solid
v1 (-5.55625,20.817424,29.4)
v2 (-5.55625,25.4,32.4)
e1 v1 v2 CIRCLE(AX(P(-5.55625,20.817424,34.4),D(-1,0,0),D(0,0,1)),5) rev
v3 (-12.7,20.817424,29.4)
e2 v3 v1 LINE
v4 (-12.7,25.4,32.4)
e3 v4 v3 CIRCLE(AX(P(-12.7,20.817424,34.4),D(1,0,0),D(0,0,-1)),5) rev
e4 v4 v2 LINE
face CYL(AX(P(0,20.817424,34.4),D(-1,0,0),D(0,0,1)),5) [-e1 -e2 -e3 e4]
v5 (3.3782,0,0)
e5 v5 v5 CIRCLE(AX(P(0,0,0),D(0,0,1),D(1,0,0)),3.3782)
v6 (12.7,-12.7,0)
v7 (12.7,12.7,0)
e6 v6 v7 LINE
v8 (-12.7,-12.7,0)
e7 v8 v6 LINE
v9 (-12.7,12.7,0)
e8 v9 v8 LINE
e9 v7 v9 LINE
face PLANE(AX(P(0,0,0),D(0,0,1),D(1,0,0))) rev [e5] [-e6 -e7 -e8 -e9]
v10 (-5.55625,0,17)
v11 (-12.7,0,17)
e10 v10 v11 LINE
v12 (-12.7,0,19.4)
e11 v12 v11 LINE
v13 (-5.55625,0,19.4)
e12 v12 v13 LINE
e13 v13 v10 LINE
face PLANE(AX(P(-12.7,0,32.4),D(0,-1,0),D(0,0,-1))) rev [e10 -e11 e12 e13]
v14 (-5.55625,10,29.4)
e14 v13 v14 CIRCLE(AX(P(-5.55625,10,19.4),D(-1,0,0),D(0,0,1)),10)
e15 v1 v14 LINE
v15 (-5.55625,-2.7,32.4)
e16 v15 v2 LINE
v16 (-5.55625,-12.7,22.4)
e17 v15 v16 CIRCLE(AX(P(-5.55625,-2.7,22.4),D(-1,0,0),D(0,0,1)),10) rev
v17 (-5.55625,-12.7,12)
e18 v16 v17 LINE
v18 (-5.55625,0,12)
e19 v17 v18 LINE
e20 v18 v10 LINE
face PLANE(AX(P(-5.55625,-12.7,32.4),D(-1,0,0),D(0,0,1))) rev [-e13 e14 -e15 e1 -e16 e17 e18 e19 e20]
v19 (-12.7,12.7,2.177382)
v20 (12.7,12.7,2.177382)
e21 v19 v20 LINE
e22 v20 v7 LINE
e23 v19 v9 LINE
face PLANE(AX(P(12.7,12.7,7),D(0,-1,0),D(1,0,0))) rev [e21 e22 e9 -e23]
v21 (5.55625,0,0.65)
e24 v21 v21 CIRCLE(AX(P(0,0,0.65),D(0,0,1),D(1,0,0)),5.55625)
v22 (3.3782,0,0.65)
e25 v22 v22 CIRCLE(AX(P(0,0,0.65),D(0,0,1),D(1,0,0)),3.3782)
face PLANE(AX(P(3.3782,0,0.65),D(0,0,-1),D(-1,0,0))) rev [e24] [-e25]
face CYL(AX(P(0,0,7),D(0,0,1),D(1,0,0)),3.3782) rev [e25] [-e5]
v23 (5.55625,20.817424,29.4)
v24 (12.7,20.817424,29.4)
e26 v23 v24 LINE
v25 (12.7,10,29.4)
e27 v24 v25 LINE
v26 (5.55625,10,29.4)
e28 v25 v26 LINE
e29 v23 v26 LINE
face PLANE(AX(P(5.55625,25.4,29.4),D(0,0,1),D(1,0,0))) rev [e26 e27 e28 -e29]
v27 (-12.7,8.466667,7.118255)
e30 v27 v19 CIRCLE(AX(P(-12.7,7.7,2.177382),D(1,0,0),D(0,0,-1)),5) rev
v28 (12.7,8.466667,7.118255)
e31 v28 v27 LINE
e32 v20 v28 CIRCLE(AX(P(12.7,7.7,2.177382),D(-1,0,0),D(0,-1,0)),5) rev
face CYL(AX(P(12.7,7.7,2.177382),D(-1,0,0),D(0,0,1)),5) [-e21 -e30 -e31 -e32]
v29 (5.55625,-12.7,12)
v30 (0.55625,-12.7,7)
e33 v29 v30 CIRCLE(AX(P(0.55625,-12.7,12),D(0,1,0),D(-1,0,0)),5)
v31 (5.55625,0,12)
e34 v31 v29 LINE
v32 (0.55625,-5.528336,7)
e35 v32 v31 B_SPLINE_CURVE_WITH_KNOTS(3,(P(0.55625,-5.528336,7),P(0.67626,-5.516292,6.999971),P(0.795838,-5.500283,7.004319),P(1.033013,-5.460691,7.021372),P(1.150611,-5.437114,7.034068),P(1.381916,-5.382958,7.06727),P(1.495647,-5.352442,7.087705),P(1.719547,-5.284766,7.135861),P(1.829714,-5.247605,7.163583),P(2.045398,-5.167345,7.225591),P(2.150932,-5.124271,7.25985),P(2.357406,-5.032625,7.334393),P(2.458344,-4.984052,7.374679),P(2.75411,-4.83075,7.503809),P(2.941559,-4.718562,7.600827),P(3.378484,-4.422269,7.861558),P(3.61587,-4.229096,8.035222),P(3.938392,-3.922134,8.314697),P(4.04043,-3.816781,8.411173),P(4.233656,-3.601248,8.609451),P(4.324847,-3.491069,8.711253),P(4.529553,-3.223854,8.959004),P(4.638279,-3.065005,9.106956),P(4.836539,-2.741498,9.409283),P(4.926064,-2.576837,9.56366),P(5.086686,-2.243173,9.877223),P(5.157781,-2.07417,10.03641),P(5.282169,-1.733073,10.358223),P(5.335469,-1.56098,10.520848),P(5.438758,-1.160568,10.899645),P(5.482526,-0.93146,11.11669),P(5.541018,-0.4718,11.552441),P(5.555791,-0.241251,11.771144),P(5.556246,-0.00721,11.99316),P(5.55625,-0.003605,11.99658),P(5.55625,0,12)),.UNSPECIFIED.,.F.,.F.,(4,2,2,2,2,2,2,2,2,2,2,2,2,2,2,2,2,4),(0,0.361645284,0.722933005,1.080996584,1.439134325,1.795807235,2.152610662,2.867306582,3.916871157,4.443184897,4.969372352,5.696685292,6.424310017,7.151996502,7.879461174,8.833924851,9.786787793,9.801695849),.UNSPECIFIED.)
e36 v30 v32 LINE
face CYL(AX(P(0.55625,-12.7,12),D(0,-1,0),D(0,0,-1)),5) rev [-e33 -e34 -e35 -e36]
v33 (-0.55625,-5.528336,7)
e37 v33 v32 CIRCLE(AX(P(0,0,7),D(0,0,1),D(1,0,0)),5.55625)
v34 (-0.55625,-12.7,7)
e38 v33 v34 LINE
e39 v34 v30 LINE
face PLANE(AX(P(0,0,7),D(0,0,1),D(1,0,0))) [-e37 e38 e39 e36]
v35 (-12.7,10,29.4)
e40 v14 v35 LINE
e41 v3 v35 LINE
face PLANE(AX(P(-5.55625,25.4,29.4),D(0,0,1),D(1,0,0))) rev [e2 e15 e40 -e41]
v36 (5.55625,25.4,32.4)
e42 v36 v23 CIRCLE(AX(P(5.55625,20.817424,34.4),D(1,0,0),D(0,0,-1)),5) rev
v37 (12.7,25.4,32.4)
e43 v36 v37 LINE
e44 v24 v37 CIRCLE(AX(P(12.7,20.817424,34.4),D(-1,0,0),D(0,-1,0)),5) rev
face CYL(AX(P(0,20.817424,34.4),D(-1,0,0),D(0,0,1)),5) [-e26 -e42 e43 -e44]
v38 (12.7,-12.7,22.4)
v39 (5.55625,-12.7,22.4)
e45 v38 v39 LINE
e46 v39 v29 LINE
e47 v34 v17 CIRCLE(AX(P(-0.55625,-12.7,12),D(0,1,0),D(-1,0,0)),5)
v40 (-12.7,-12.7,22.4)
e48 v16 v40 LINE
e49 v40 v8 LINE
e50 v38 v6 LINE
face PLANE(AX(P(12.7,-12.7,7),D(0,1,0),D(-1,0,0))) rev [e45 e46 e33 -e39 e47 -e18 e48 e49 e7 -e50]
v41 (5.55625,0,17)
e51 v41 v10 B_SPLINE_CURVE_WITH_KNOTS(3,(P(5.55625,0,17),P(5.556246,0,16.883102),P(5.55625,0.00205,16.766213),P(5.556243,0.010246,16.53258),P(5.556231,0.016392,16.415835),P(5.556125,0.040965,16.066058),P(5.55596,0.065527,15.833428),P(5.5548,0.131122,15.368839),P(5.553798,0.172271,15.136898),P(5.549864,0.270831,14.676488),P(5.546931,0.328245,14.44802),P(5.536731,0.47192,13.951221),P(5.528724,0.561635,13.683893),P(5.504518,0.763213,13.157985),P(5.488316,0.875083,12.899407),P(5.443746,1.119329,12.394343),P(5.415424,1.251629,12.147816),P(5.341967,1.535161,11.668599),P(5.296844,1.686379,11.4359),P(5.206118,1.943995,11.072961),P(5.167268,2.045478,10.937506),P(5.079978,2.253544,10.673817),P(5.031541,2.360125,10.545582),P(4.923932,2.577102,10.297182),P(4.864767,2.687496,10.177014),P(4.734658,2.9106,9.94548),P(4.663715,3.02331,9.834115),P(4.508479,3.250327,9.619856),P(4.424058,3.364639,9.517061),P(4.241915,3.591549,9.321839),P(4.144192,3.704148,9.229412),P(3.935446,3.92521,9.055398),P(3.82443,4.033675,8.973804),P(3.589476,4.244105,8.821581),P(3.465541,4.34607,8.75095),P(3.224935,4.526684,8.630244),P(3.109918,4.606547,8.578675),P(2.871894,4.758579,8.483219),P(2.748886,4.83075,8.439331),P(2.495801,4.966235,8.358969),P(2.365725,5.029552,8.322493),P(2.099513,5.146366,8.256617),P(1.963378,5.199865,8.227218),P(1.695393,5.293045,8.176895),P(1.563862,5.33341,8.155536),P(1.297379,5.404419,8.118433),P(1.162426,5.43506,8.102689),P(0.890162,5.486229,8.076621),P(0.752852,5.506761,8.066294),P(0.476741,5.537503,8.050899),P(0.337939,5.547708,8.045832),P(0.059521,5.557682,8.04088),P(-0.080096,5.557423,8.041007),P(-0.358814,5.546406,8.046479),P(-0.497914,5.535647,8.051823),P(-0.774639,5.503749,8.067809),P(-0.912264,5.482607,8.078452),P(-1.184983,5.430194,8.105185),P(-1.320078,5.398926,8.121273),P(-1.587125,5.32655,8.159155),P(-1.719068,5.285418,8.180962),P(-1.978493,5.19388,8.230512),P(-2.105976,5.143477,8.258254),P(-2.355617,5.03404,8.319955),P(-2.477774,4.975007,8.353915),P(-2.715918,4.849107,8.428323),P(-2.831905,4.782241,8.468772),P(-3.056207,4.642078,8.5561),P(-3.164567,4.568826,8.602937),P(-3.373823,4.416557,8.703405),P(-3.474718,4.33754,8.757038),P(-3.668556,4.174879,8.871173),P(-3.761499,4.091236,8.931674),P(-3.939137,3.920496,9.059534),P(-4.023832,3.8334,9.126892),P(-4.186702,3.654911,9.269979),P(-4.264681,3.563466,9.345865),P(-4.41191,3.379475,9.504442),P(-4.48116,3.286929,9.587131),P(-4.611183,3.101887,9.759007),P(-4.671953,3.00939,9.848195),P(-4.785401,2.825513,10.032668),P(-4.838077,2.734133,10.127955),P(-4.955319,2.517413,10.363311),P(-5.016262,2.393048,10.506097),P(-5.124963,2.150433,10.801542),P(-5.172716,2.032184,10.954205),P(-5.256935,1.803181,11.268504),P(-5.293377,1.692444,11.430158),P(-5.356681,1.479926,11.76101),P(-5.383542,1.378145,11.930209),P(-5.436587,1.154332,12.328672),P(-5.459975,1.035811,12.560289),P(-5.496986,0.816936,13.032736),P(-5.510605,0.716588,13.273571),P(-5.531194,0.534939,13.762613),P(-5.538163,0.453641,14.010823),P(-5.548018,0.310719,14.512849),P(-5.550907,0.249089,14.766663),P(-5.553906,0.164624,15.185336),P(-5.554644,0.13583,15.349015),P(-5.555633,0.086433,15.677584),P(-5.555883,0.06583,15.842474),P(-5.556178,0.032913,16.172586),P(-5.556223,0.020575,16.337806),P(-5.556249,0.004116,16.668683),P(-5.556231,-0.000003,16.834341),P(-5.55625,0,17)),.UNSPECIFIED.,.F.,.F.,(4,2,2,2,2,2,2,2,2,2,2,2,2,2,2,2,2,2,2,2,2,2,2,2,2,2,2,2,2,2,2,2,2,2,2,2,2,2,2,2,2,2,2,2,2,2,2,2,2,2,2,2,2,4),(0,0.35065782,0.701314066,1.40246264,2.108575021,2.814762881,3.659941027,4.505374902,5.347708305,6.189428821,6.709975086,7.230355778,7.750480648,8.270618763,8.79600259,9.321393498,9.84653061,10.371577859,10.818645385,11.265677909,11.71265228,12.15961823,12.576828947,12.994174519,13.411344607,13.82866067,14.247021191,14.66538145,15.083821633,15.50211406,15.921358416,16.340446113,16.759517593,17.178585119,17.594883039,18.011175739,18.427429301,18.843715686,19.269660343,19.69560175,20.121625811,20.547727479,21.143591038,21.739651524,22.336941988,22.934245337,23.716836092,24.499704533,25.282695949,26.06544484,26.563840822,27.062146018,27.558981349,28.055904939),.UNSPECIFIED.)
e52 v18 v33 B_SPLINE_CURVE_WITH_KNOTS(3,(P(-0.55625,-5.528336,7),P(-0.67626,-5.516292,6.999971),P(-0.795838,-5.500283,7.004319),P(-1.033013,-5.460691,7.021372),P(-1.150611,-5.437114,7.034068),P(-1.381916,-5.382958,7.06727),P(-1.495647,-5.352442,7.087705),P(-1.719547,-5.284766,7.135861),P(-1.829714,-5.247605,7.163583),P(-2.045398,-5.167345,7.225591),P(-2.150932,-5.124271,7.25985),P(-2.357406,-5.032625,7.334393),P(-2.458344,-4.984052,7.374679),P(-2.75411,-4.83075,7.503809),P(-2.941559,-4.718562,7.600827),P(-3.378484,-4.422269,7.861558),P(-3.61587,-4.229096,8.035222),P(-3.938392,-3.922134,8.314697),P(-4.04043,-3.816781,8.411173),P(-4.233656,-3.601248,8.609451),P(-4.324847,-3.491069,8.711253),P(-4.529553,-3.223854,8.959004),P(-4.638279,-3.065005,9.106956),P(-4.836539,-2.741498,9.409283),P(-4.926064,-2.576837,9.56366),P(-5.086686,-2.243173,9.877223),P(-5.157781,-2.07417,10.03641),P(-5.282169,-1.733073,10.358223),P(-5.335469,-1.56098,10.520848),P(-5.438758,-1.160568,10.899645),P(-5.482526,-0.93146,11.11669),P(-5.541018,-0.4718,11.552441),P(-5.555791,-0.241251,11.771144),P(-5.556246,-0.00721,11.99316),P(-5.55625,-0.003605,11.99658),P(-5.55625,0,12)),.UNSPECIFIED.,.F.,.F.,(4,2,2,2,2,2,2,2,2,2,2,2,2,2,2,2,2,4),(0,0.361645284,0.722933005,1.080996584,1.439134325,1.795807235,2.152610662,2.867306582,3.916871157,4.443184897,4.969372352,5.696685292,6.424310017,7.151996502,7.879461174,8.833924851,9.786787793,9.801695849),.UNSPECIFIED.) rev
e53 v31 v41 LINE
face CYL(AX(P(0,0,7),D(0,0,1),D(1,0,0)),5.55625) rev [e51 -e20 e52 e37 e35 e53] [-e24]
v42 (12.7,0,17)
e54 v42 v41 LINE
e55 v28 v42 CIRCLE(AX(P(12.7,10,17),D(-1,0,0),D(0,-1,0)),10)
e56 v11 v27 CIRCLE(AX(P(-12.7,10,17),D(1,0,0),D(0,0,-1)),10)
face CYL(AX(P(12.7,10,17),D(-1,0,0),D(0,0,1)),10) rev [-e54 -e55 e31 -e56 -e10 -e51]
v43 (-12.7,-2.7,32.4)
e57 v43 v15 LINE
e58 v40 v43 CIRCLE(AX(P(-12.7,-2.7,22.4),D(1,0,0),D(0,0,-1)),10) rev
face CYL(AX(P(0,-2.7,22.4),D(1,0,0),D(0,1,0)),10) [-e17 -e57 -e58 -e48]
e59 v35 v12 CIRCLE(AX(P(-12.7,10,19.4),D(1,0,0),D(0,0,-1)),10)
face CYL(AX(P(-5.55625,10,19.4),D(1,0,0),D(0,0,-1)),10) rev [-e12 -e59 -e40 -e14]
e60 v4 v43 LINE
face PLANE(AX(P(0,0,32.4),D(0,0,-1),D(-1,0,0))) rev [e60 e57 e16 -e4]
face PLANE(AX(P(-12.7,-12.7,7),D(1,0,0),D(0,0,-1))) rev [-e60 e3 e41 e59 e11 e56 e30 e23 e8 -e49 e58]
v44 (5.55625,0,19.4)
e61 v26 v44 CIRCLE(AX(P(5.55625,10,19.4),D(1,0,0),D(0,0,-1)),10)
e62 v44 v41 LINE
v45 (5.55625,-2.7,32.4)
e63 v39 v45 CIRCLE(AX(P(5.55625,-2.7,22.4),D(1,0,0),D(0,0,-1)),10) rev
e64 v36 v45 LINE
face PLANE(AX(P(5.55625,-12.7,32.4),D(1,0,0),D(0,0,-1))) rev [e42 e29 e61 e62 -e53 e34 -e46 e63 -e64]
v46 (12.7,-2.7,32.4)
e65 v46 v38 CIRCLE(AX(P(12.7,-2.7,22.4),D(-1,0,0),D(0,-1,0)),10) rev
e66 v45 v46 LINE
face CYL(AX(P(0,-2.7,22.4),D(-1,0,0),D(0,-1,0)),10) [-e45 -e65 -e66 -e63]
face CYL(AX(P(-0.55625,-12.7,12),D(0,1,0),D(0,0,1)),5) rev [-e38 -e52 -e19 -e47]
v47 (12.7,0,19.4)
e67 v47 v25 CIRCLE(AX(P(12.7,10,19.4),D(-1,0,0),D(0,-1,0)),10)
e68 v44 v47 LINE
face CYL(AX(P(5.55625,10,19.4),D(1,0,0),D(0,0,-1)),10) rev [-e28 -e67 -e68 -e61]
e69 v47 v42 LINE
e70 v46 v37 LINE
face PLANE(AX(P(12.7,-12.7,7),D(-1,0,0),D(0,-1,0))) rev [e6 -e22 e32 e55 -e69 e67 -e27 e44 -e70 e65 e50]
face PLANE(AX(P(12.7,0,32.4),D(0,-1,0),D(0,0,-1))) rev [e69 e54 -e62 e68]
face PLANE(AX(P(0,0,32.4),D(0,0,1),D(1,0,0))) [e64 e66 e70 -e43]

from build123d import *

# Parameters (mm, degrees)
SKETCH1_W                                        = 25.4
SKETCH1_H                                        = 25.4
BOSS_EXTRUDE1_DEPTH                              = 7
CBORE_FOR_1_4_SOCKET_HEAD_CAP_SCREW1_D           = 6.7564
CBORE_FOR_1_4_SOCKET_HEAD_CAP_SCREW1_CBORE_D     = 11.1125
CBORE_FOR_1_4_SOCKET_HEAD_CAP_SCREW1_CBORE_DEPTH = 6.35
SKETCH4_W                                        = 7.14375
SKETCH4_H                                        = 12.7
BOSS_EXTRUDE2_DEPTH                              = 25.4
SKETCH5_W                                        = 7.14375
SKETCH5_H                                        = 3
BOSS_EXTRUDE3_DEPTH                              = 25.4
FILLET1_R                                        = 10
FILLET2_START                                    = -14
FILLET2_DEPTH                                    = 28
FILLET2_START_2                                  = -12.7
FILLET2_2_DEPTH                                  = 12.604348727
FILLET2_START_3                                  = 7
FILLET2_3_DEPTH                                  = 10.0000001


with BuildPart() as part:
    # Sketch1 → Boss-Extrude1 (new body)
    with BuildSketch(Plane.XY):
        Rectangle(SKETCH1_W, SKETCH1_H)
    extrude(amount=BOSS_EXTRUDE1_DEPTH)

    # CBORE for 1/4 Socket Head Cap Screw1 (through all)
    with Locations(Plane.XY.offset(7)):
        with Locations((0, 0)):
            CounterBoreHole(CBORE_FOR_1_4_SOCKET_HEAD_CAP_SCREW1_D / 2, CBORE_FOR_1_4_SOCKET_HEAD_CAP_SCREW1_CBORE_D / 2, CBORE_FOR_1_4_SOCKET_HEAD_CAP_SCREW1_CBORE_DEPTH)

    # Sketch4 → Boss-Extrude2 (add)
    with BuildSketch(Plane.XY.offset(7)):
        with Locations((-9.128125, -6.35)):
            Rectangle(SKETCH4_W, SKETCH4_H)
        with Locations((9.128125, -6.35)):
            Rectangle(SKETCH4_W, SKETCH4_H)
    extrude(amount=BOSS_EXTRUDE2_DEPTH)

    # Sketch5 → Boss-Extrude3 (add)
    with BuildSketch(Plane(origin=(0, 0, 0), x_dir=(1, 0, 0), z_dir=(0, 1, 0))):
        with Locations((-9.128125, -30.9)):
            Rectangle(SKETCH5_W, SKETCH5_H)
        with Locations((9.128125, -30.9)):
            Rectangle(SKETCH5_W, SKETCH5_H)
    extrude(amount=BOSS_EXTRUDE3_DEPTH)

    # Fillet1
    # the kernel refuses this fillet: 10 mm, written as the material it adds along each edge
    with BuildSketch(Plane(origin=(-19.44375, 0, 7), x_dir=(0, 1, 0), z_dir=(1, 0, 0))) as fillet1_piece_1_section:
        with BuildLine():
            CenterArc((FILLET1_R, FILLET1_R), FILLET1_R, 180, 90)
            Line((0, FILLET1_R), (0, 0))
            Line((0, 0), (FILLET1_R, 0))
        make_face()
    fillet1_piece_1 = extrude(amount=32.14375, mode=Mode.PRIVATE)
    fillet1_piece_1 = fillet1_piece_1 - Plane(origin=(0, 0, 7), x_dir=(1, 0, 0), z_dir=(0, 0, 1)) * Cylinder(5.55625, 105, mode=Mode.PRIVATE)
    fillet1_piece_1 = split(fillet1_piece_1, bisect_by=Plane(origin=(-12.7, 0, 7), z_dir=(1, 0, 0)), keep=Keep.TOP, mode=Mode.PRIVATE)
    add(fillet1_piece_1)
    with BuildSketch(Plane(origin=(-12.7, 0, 29.4), x_dir=(0, 0, -1), z_dir=(1, 0, 0))) as fillet1_piece_2:
        with BuildLine():
            CenterArc((FILLET1_R, FILLET1_R), FILLET1_R, 180, 90)
            Line((0, FILLET1_R), (0, 0))
            Line((0, 0), (FILLET1_R, 0))
        make_face()
    extrude(amount=7.14375)
    with BuildSketch(Plane(origin=(-37.7, 0, 29.4), x_dir=(0, 0, -1), z_dir=(1, 0, 0))) as fillet1_piece_3_section:
        with BuildLine():
            CenterArc((FILLET1_R, FILLET1_R), FILLET1_R, 180, 90)
            Line((0, FILLET1_R), (0, 0))
            Line((0, 0), (FILLET1_R, 0))
        make_face()
    fillet1_piece_3 = extrude(amount=57.14375, mode=Mode.PRIVATE)
    fillet1_piece_3 = split(fillet1_piece_3, bisect_by=Plane(origin=(5.55625, 0, 29.4), z_dir=(1, 0, 0)), keep=Keep.TOP, mode=Mode.PRIVATE)
    fillet1_piece_3 = split(fillet1_piece_3, bisect_by=Plane(origin=(12.7, 0, 29.4), z_dir=(-1, 0, 0)), keep=Keep.TOP, mode=Mode.PRIVATE)
    add(fillet1_piece_3)
    with BuildSketch(Plane(origin=(12.7, 0, 29.4), x_dir=(0, 0, -1), z_dir=(-1, 0, 0))) as fillet1_piece_4:
        with BuildLine():
            CenterArc((FILLET1_R, -FILLET1_R), FILLET1_R, 90, 90)
            Line((0, -FILLET1_R), (0, 0))
            Line((0, 0), (FILLET1_R, 0))
        make_face()
    extrude(amount=7.14375)
    with BuildSketch(Plane(origin=(37.7, 0, 29.4), x_dir=(0, 0, -1), z_dir=(-1, 0, 0))) as fillet1_piece_5_section:
        with BuildLine():
            CenterArc((FILLET1_R, -FILLET1_R), FILLET1_R, 90, 90)
            Line((0, -FILLET1_R), (0, 0))
            Line((0, 0), (FILLET1_R, 0))
        make_face()
    fillet1_piece_5 = extrude(amount=57.14375, mode=Mode.PRIVATE)
    fillet1_piece_5 = split(fillet1_piece_5, bisect_by=Plane(origin=(-12.7, 0, 29.4), z_dir=(1, 0, 0)), keep=Keep.TOP, mode=Mode.PRIVATE)
    fillet1_piece_5 = split(fillet1_piece_5, bisect_by=Plane(origin=(-5.55625, 0, 29.4), z_dir=(-1, 0, 0)), keep=Keep.TOP, mode=Mode.PRIVATE)
    add(fillet1_piece_5)
    # the kernel refuses this fillet: 10 mm, written as the material it takes off along each edge
    with BuildSketch(Plane(origin=(-37.7, -12.7, 32.4), x_dir=(0, 0, -1), z_dir=(1, 0, 0))) as fillet1_2_piece_1:
        with BuildLine():
            CenterArc((FILLET1_R, FILLET1_R), FILLET1_R, 180, 90)
            Line((0, FILLET1_R), (0, 0))
            Line((0, 0), (FILLET1_R, 0))
        make_face()
    extrude(amount=57.14375, mode=Mode.SUBTRACT)
    with BuildSketch(Plane(origin=(37.7, -12.7, 32.4), x_dir=(0, 0, -1), z_dir=(-1, 0, 0))) as fillet1_2_piece_2:
        with BuildLine():
            CenterArc((FILLET1_R, -FILLET1_R), FILLET1_R, 90, 90)
            Line((0, -FILLET1_R), (0, 0))
            Line((0, 0), (FILLET1_R, 0))
        make_face()
    extrude(amount=57.14375, mode=Mode.SUBTRACT)

    # Fillet2: read off the stored shape, not the designer's step
    # Fillet2 outline → Fillet2 (cut)
    with BuildSketch(Plane.YZ.offset(FILLET2_START)):
        with BuildLine():
            ThreePointArc((10, 7), (9.231056683, 7.029607521), (8.466666667, 7.118254765))
            ThreePointArc((8.466666667, 7.118254765), (11.496928583, 5.430585697), (12.7, 2.177382148))
            Line((12.7, 2.177382148), (12.7, 7))
            Line((12.7, 7), (10, 7))
        make_face()
        with BuildLine():
            Line((25.4, 29.4), (25.4, 32.4))
            ThreePointArc((25.4, 32.4), (23.556037093, 30.216699867), (20.817424305, 29.4))
            Line((20.817424305, 29.4), (25.4, 29.4))
        make_face()
    extrude(amount=FILLET2_DEPTH, mode=Mode.SUBTRACT)

    # Fillet2 2 outline → Fillet2 2 (add)
    with BuildSketch(Plane(origin=(0, 0, 0), x_dir=(1, 0, 0), z_dir=(0, 1, 0)).offset(FILLET2_START_2)):
        with BuildLine():
            Line((5.55625, -7), (0.55625, -7))
            ThreePointArc((0.55625, -7), (4.091783906, -8.464466094), (5.55625, -12))
            Line((5.55625, -12), (5.55625, -7))
        make_face()
        with BuildLine():
            ThreePointArc((-5.55625, -12), (-4.091783906, -8.464466094), (-0.55625, -7))
            Line((-0.55625, -7), (-5.55625, -7))
            Line((-5.55625, -7), (-5.55625, -12))
        make_face()
    extrude(amount=FILLET2_2_DEPTH)

    # Fillet2 3 outline → Fillet2 3 (cut)
    with BuildSketch(Plane.XY.offset(FILLET2_START_3)):
        with BuildLine():
            ThreePointArc((5.555426617, -0.095651273), (0, 5.55625), (-5.555426617, -0.095651273))
            ThreePointArc((-5.555426617, -0.095651273), (0, -5.55625), (5.555426617, -0.095651273))
        make_face()
    extrude(amount=FILLET2_3_DEPTH, mode=Mode.SUBTRACT)


solid = part.part
